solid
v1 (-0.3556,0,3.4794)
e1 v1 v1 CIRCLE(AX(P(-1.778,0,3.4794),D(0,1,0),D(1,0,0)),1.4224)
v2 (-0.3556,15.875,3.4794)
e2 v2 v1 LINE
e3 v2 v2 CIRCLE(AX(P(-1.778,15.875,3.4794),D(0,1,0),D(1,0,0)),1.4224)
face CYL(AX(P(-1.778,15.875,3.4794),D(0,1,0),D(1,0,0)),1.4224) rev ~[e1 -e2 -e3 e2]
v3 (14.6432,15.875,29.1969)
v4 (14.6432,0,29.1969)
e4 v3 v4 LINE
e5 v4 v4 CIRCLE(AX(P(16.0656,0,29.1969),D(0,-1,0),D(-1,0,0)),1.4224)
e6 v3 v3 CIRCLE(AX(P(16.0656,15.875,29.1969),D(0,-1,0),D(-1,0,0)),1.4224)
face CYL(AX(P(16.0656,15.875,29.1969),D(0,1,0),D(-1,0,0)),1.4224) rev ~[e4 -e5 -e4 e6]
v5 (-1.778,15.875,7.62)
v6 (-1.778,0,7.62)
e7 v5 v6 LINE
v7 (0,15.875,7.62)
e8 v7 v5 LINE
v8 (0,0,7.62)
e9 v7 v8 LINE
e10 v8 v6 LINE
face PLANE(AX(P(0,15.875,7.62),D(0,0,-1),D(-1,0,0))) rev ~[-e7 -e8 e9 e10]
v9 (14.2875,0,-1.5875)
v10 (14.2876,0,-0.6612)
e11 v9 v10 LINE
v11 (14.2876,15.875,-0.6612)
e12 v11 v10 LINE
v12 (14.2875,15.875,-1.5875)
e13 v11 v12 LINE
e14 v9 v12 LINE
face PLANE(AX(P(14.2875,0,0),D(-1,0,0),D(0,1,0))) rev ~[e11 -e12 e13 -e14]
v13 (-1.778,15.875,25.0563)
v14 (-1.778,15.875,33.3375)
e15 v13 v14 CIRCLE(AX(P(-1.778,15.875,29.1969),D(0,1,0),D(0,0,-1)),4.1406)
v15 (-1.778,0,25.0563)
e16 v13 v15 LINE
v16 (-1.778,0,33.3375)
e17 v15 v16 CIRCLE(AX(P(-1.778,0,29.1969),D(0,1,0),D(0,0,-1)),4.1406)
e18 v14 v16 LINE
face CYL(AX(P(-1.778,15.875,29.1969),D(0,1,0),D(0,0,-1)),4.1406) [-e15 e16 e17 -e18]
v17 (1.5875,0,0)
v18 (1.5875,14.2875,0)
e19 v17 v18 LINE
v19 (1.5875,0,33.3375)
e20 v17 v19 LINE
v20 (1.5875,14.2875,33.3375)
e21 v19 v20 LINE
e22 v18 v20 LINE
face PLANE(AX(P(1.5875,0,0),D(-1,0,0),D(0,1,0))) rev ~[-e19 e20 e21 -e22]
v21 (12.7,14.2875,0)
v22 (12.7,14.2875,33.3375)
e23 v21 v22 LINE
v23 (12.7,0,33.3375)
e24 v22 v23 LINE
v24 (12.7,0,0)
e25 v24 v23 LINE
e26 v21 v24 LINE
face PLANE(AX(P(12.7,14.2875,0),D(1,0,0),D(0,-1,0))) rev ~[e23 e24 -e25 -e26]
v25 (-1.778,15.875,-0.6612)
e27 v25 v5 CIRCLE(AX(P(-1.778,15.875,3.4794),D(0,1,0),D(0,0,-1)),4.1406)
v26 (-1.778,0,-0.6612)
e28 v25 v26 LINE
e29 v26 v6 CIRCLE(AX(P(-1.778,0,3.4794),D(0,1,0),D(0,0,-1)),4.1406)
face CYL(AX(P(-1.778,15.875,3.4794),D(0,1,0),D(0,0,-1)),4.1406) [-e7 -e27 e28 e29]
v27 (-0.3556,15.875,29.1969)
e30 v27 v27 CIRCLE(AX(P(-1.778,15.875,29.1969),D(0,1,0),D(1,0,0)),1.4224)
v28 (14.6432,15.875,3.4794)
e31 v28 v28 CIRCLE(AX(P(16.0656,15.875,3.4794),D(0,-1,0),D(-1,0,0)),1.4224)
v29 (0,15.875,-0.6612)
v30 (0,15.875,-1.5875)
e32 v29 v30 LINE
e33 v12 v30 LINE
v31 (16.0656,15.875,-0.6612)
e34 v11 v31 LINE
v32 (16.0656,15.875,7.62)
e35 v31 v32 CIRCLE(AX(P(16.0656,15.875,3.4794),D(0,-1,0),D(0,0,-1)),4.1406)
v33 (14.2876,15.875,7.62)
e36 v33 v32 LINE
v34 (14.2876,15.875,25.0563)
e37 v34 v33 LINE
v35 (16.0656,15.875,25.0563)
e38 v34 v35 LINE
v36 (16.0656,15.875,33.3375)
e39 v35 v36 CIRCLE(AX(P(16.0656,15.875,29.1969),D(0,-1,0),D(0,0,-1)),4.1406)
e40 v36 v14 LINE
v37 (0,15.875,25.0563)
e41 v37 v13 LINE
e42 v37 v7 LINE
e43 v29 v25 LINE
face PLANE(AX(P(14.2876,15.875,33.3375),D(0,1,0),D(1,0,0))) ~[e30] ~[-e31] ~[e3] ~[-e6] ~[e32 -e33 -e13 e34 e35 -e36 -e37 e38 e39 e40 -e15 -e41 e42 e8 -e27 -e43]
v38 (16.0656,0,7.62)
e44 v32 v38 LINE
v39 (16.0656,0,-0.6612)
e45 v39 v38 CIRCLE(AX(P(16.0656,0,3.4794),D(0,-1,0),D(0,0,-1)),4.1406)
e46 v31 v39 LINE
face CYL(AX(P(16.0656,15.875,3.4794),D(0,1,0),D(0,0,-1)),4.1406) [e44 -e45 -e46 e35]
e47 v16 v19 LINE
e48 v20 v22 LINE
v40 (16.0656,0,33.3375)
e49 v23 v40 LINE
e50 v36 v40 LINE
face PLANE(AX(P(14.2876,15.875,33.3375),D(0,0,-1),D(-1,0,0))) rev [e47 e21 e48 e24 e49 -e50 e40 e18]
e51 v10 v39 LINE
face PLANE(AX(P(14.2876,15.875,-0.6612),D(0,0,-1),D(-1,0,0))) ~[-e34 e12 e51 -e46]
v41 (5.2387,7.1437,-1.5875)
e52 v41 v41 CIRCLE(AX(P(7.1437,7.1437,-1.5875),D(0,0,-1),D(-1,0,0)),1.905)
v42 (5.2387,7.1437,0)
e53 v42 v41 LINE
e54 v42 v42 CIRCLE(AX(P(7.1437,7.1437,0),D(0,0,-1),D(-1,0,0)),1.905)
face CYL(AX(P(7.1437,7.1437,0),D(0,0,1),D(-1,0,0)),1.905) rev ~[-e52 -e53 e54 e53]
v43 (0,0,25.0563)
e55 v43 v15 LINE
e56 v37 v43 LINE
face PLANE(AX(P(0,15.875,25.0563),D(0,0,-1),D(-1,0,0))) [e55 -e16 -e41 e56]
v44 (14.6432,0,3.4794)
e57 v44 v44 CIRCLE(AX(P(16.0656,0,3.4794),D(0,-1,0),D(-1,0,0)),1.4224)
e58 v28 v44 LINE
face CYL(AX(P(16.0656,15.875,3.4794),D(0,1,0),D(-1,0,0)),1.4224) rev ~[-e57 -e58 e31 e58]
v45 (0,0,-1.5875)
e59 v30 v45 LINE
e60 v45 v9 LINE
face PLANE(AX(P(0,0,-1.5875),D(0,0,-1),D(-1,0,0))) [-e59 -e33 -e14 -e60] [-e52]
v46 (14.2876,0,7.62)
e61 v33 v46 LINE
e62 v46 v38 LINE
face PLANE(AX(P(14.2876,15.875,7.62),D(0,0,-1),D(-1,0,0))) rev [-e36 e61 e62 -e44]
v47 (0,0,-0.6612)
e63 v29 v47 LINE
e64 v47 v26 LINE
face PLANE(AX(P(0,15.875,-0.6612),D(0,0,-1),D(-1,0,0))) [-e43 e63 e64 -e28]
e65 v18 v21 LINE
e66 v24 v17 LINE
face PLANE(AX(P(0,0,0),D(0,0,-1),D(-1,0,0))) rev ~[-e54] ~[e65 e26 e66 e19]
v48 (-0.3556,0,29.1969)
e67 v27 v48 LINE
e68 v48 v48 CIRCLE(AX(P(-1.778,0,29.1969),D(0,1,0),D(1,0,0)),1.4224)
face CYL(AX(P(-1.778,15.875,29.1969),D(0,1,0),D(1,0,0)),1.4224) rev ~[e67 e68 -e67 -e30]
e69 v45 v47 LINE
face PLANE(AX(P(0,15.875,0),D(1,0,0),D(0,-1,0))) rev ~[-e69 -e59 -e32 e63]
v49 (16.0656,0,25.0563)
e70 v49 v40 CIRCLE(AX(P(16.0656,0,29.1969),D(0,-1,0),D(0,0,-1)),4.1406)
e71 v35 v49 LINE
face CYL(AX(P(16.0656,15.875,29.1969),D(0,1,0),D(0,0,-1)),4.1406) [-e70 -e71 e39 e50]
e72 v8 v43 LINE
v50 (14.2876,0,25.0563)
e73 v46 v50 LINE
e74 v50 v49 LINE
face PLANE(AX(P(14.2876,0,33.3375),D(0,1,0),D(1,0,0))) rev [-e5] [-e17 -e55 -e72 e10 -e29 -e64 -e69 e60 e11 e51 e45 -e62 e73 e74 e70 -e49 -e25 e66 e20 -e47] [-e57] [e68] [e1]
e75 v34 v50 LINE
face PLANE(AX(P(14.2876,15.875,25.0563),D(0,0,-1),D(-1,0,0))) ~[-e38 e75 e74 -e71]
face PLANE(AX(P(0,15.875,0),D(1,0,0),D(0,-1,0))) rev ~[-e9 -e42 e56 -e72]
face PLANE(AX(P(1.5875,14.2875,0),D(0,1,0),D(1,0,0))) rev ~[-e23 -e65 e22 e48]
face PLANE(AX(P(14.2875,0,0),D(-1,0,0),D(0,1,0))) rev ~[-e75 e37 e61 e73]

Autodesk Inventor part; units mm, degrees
ref_plane "YZ Plane" through (0, 0, 0) normal (1, 0, 0) x (0, 1, 0)
ref_plane "XZ Plane" through (0, 0, 0) normal (0, 1, 0) x (-1, 0, 0)
sketch "Sketch1" plane through (0, 0, 0) normal (0, 0, 1) x (1, 0, 0)
  line L0 (0, 0) -> (1.5875, 0)
  line L1 (1.5875, 0) -> (1.5875, 14.2875)
  line L2 (1.5875, 14.2875) -> (12.7, 14.2875)
  line L3 (12.7, 14.2875) -> (12.7, 0)
  line L4 (12.7, 0) -> (14.2875, 0)
  line L5 (14.2875, 0) -> (14.2875, 15.875)
  line L6 (14.2875, 15.875) -> (0, 15.875)
  line L7 (0, 15.875) -> (0, 0)
  dimension "d1" = 11.1125
  dimension "wallThickness" = 1.5875
  dimension "d4" = 1.5875
  dimension "d5" = 1.5875
  dimension "d6" = 14.2875
  dimension "outerWidth" = 14.2875
extrude "Extrusion1" add sketch "Sketch1" along normal blind 33.3375
sketch "Sketch2" plane through (0, 0, 0) normal (0, 0, -1) x (-1, 0, 0)
  line L0 (0, 15.875) -> (0, 0) projected
  line L1 (-14.2875, 15.875) -> (0, 15.875) projected
  line L2 (-14.2875, 0) -> (-14.2875, 15.875) projected
  line L3 (-14.2875, 0) -> (0, 0)
  line L4 (-12.7, 14.2875) -> (-12.7, 0) projected
  circle A0 centre (-7.1437, 7.1437) radius 1.905
  dimension "d11" = 3.81
  dimension "d12" = 7.1437
  dimension "d13" = 5.5563
extrude "Extrusion3" add sketch "Sketch2" along normal blind 1.5875
sketch "Sketch3" plane through (0, 15.875, 33.3375) normal (0, 1, 0) x (1, 0, 0)
  line L0 (0, 34.925) -> (0, 0) projected
  circle A0 centre (-1.778, 4.1406) radius 1.4224
  line L1 (0, 0) -> (-1.778, 0)
  line L2 (0, 8.2812) -> (-1.778, 8.2812)
  arc A1 (-1.778, 8.2812) -> (-1.778, 0) centre (-1.778, 4.1406) ccw
  line L3 (0, 0) -> (14.2875, 0) projected
  point P0 (0, 33.3375)
  dimension "screwOuterDiameter" = 8.2812
  dimension "d24" = 4.1406
  dimension "d25" = 0
  dimension "screwHoleOffsetFromSide" = 1.778
  dimension "screwHoleDiameter" = 2.8448
extrude "Extrusion4" add sketch "Sketch3" against normal blind 15.875
pattern_linear "Rectangular Pattern1" count 2 spacing 25.7175 along (0, 0, -1) of "Extrusion4"
ref_plane "Work Plane1" through (7.1438, 0, 33.3375) normal (-1, 0, 0) x (0, 0, -1)
mirror "Mirror1" about plane through (7.1438, 0, 33.3375) normal (-1, 0, 0) of "Extrusion4", "Rectangular Pattern1"
equation "\"d1\" = plungerWidth + plungerTolerance"
equation "\"d4\" = wallThickness"
equation "\"d5\" = wallThickness"
equation "\"d6\" = plungerHeight + plungerTolerance"
equation "\"outerLength\" = plungerLength + springLength"
equation "\"d12\" = 0.5 * d6"
equation "\"d13\" = 0.5 * d1"
equation "\"d14\" = wallThickness"
equation "\"d24\" = 0.5 * screwOuterDiameter"
equation "\"d28\" = wallThickness + plungerHeight + plungerTolerance"
equation "\"plungerWidth\" = 9.525"
equation "\"plungerTolerance\" = 1.5875"
equation "\"plungerHeight\" = 12.7"
equation "\"plungerLength\" = 12.7"
equation "\"springLength\" = 20.6375"
properties part number "BatteryLatch-Outer"
